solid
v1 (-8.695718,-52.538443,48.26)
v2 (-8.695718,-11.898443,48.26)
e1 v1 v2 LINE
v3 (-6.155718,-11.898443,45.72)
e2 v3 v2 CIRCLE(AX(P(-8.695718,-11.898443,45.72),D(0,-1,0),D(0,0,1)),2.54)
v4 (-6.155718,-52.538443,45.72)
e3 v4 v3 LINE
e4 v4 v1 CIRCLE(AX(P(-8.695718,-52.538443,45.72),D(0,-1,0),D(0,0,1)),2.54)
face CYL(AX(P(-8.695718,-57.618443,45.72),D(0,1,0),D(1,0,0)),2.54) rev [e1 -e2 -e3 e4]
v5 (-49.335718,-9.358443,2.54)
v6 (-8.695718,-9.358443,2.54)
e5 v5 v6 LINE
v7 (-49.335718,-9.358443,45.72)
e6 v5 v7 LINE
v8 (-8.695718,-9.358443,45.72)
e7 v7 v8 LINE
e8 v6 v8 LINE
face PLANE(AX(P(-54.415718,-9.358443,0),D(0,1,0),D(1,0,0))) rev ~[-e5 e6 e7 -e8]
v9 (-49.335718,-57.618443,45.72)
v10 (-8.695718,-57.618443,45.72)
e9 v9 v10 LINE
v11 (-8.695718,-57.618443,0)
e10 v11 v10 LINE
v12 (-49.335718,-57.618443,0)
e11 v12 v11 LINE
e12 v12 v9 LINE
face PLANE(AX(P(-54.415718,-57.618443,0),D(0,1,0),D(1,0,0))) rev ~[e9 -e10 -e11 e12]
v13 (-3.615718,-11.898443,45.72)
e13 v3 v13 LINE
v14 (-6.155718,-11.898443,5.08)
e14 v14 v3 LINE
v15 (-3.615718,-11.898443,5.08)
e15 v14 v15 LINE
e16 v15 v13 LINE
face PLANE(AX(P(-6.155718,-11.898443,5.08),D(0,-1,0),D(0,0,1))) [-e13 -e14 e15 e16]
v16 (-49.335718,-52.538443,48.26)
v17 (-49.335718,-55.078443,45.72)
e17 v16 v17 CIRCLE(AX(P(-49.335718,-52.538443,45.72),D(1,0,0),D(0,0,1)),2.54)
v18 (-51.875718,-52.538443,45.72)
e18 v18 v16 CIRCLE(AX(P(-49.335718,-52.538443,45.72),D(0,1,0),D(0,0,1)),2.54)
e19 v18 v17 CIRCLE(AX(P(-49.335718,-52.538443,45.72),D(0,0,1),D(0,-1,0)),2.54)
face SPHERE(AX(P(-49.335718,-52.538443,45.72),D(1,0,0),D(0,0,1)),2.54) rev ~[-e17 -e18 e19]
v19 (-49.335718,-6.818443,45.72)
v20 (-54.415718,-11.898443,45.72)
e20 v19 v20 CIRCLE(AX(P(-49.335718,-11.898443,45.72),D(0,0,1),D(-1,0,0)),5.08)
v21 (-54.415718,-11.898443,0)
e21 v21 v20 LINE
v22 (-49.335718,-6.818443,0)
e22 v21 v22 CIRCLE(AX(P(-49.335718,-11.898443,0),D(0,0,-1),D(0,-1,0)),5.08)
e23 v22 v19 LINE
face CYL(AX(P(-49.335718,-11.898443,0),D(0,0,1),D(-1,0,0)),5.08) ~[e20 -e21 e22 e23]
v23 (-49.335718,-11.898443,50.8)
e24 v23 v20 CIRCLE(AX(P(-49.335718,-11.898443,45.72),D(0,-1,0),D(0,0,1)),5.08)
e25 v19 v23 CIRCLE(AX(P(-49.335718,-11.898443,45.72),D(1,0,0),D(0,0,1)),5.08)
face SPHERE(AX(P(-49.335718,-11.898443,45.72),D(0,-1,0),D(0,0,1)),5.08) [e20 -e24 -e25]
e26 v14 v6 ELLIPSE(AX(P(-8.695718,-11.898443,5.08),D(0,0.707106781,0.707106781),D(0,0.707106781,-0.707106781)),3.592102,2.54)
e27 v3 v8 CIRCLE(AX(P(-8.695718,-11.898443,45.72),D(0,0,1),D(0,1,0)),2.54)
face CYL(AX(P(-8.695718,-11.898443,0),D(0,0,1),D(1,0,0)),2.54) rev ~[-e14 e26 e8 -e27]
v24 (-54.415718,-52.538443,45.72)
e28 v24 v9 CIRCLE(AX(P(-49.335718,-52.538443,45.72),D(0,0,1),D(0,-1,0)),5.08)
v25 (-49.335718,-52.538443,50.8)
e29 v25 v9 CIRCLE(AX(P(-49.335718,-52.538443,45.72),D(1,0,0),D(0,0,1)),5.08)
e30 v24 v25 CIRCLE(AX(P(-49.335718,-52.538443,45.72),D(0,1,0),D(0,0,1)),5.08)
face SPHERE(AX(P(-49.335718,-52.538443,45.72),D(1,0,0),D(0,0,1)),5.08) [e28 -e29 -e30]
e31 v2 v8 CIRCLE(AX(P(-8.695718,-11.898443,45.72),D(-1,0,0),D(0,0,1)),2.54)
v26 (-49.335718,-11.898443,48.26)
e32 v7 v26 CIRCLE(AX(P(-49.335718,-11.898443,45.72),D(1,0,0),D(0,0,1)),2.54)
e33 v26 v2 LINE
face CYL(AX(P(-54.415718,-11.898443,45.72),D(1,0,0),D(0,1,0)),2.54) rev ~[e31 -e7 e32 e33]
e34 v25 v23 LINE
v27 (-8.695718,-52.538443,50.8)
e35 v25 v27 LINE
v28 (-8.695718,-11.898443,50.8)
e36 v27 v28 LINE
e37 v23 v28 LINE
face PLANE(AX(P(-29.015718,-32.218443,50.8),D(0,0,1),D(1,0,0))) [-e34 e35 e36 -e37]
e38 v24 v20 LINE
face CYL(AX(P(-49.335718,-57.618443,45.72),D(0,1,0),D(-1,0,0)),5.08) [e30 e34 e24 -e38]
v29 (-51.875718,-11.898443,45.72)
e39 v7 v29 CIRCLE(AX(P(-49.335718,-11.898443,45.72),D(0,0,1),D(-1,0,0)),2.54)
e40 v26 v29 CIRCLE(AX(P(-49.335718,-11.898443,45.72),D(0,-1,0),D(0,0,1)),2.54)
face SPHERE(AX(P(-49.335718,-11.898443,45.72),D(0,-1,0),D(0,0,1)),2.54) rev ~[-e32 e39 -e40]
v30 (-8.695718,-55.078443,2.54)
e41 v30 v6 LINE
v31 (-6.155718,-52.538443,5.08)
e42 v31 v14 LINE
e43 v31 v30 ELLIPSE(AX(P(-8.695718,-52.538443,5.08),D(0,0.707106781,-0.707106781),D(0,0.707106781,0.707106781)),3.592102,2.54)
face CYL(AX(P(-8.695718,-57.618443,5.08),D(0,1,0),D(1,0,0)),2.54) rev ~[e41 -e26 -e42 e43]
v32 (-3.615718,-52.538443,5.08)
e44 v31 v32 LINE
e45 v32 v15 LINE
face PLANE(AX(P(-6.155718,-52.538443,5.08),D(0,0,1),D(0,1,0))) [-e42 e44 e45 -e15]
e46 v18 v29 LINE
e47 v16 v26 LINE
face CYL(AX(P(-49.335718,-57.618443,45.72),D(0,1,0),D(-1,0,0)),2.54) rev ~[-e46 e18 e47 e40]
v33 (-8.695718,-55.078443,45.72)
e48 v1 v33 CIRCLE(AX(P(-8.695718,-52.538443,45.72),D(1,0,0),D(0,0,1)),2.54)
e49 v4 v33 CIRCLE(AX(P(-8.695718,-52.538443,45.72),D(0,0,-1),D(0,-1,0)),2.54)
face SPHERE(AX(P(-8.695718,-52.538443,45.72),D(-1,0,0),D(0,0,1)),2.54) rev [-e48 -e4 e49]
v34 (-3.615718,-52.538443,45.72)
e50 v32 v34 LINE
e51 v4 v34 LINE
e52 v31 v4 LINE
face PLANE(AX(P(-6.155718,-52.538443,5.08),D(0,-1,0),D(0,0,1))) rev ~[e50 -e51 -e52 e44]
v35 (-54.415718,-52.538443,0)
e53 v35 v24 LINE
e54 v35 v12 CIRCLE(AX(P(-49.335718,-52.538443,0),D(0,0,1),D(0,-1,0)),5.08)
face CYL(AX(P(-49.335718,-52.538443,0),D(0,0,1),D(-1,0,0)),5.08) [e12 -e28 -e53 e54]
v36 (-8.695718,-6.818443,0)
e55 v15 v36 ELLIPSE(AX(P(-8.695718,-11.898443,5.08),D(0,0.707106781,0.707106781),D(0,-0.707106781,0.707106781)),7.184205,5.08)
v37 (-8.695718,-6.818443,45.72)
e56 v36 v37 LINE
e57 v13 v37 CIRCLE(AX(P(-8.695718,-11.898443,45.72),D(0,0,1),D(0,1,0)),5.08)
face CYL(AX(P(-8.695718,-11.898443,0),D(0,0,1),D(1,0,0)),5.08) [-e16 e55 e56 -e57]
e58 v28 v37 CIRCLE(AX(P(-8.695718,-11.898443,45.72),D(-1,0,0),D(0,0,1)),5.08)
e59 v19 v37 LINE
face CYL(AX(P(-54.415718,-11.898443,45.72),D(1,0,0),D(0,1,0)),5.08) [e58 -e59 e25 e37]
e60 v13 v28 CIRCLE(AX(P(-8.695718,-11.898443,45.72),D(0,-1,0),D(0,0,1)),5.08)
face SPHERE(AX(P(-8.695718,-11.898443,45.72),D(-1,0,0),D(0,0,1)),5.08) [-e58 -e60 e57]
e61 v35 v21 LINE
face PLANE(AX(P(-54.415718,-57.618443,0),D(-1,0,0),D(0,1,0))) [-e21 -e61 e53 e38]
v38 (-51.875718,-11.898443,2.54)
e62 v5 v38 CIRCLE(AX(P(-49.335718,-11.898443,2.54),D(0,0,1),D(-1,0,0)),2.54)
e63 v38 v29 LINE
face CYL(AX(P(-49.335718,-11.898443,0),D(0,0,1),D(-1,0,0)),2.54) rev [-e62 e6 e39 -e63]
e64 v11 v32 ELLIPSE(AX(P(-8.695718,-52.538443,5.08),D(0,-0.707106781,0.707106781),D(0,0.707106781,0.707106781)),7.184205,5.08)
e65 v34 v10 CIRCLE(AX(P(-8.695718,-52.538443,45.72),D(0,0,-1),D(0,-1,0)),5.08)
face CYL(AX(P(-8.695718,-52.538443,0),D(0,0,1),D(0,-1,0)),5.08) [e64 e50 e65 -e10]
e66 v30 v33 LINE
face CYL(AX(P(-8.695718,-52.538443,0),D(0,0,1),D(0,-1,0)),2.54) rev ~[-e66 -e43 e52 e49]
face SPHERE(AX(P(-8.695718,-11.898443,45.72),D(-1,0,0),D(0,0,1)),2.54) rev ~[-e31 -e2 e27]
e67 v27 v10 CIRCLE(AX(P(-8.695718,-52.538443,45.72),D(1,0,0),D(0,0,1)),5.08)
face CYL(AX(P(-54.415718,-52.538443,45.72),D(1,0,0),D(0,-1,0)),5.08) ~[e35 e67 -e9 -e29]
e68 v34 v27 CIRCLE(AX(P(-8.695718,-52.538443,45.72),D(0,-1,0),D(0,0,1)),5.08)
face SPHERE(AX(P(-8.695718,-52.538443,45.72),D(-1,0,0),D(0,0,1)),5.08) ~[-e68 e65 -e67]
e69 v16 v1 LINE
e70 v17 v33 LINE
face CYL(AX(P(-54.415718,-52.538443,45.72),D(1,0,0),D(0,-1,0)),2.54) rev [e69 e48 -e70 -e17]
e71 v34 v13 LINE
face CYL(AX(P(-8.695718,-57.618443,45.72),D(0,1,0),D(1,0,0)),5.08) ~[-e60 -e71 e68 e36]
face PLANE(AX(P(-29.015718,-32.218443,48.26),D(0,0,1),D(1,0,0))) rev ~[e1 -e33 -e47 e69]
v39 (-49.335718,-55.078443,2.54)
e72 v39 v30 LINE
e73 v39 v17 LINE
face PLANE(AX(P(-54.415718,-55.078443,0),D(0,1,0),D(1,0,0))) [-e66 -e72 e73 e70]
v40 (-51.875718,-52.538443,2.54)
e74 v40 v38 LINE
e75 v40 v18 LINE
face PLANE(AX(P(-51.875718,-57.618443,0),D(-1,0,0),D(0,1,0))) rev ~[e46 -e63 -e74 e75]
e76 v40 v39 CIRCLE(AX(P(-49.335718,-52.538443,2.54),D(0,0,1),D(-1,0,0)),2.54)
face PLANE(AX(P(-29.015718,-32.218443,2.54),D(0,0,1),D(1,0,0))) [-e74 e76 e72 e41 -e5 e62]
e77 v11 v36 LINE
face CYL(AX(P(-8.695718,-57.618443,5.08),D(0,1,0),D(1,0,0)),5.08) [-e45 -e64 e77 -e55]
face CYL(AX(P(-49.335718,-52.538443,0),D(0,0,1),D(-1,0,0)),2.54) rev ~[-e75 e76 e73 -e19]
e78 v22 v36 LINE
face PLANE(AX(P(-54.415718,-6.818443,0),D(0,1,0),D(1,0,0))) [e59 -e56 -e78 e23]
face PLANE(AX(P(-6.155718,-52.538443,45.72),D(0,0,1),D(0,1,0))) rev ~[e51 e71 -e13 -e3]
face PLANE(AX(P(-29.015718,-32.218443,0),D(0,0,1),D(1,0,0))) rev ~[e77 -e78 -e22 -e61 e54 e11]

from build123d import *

# Parameters (mm, degrees)
F0_W     = 50.8
F0_H     = 50.8
F1_DEPTH = 50.8
F3_R     = 5.08
F4_T     = -2.54


# Not quite as in the source:
# - a shell that OpenCascade refuses in one call is made with other operations: the cavity is built on its own and cut out


with BuildPart() as f1:
    # F0 (on Top) → F1 (new body)
    with BuildSketch(Plane.XY):
        with Locations((-29.015717721, -32.2184429228)):
            Rectangle(F0_W, F0_H)
    extrude(amount=F1_DEPTH)

    # F3
    f3_edges = [f1.edges().sort_by_distance(p)[0] for p in [
        (-29.015718, -57.618443, 50.8),
        (-54.415718, -32.218443, 50.8),
        (-29.015718, -6.818443, 50.8),
        (-3.615718, -32.218443, 50.8),
        (-54.415718, -57.618443, 25.4),
        (-54.415718, -6.818443, 25.4),
        (-3.615718, -6.818443, 25.4),
        (-3.615718, -57.618443, 25.4),
        (-3.615718, -32.218443, 0),
    ]]
    fillet(f3_edges, radius=F3_R)

    # F4: a shell. OpenCascade refuses it in one call, so the cavity is built on its own and cut out:
    # the body offset inwards by the wall thickness, plus a prism from it out through each open face.
    f4_core = offset(f1.part, amount=F4_T, mode=Mode.PRIVATE)
    f4_exits = [f4_core.faces().sort_by_distance(p)[0] for p in [
        (-6.155718, -32.218443, 25.4),
    ]]
    add(f4_core, mode=Mode.SUBTRACT)
    extrude(f4_exits, amount=-F4_T, mode=Mode.SUBTRACT)


solid = f1.part
